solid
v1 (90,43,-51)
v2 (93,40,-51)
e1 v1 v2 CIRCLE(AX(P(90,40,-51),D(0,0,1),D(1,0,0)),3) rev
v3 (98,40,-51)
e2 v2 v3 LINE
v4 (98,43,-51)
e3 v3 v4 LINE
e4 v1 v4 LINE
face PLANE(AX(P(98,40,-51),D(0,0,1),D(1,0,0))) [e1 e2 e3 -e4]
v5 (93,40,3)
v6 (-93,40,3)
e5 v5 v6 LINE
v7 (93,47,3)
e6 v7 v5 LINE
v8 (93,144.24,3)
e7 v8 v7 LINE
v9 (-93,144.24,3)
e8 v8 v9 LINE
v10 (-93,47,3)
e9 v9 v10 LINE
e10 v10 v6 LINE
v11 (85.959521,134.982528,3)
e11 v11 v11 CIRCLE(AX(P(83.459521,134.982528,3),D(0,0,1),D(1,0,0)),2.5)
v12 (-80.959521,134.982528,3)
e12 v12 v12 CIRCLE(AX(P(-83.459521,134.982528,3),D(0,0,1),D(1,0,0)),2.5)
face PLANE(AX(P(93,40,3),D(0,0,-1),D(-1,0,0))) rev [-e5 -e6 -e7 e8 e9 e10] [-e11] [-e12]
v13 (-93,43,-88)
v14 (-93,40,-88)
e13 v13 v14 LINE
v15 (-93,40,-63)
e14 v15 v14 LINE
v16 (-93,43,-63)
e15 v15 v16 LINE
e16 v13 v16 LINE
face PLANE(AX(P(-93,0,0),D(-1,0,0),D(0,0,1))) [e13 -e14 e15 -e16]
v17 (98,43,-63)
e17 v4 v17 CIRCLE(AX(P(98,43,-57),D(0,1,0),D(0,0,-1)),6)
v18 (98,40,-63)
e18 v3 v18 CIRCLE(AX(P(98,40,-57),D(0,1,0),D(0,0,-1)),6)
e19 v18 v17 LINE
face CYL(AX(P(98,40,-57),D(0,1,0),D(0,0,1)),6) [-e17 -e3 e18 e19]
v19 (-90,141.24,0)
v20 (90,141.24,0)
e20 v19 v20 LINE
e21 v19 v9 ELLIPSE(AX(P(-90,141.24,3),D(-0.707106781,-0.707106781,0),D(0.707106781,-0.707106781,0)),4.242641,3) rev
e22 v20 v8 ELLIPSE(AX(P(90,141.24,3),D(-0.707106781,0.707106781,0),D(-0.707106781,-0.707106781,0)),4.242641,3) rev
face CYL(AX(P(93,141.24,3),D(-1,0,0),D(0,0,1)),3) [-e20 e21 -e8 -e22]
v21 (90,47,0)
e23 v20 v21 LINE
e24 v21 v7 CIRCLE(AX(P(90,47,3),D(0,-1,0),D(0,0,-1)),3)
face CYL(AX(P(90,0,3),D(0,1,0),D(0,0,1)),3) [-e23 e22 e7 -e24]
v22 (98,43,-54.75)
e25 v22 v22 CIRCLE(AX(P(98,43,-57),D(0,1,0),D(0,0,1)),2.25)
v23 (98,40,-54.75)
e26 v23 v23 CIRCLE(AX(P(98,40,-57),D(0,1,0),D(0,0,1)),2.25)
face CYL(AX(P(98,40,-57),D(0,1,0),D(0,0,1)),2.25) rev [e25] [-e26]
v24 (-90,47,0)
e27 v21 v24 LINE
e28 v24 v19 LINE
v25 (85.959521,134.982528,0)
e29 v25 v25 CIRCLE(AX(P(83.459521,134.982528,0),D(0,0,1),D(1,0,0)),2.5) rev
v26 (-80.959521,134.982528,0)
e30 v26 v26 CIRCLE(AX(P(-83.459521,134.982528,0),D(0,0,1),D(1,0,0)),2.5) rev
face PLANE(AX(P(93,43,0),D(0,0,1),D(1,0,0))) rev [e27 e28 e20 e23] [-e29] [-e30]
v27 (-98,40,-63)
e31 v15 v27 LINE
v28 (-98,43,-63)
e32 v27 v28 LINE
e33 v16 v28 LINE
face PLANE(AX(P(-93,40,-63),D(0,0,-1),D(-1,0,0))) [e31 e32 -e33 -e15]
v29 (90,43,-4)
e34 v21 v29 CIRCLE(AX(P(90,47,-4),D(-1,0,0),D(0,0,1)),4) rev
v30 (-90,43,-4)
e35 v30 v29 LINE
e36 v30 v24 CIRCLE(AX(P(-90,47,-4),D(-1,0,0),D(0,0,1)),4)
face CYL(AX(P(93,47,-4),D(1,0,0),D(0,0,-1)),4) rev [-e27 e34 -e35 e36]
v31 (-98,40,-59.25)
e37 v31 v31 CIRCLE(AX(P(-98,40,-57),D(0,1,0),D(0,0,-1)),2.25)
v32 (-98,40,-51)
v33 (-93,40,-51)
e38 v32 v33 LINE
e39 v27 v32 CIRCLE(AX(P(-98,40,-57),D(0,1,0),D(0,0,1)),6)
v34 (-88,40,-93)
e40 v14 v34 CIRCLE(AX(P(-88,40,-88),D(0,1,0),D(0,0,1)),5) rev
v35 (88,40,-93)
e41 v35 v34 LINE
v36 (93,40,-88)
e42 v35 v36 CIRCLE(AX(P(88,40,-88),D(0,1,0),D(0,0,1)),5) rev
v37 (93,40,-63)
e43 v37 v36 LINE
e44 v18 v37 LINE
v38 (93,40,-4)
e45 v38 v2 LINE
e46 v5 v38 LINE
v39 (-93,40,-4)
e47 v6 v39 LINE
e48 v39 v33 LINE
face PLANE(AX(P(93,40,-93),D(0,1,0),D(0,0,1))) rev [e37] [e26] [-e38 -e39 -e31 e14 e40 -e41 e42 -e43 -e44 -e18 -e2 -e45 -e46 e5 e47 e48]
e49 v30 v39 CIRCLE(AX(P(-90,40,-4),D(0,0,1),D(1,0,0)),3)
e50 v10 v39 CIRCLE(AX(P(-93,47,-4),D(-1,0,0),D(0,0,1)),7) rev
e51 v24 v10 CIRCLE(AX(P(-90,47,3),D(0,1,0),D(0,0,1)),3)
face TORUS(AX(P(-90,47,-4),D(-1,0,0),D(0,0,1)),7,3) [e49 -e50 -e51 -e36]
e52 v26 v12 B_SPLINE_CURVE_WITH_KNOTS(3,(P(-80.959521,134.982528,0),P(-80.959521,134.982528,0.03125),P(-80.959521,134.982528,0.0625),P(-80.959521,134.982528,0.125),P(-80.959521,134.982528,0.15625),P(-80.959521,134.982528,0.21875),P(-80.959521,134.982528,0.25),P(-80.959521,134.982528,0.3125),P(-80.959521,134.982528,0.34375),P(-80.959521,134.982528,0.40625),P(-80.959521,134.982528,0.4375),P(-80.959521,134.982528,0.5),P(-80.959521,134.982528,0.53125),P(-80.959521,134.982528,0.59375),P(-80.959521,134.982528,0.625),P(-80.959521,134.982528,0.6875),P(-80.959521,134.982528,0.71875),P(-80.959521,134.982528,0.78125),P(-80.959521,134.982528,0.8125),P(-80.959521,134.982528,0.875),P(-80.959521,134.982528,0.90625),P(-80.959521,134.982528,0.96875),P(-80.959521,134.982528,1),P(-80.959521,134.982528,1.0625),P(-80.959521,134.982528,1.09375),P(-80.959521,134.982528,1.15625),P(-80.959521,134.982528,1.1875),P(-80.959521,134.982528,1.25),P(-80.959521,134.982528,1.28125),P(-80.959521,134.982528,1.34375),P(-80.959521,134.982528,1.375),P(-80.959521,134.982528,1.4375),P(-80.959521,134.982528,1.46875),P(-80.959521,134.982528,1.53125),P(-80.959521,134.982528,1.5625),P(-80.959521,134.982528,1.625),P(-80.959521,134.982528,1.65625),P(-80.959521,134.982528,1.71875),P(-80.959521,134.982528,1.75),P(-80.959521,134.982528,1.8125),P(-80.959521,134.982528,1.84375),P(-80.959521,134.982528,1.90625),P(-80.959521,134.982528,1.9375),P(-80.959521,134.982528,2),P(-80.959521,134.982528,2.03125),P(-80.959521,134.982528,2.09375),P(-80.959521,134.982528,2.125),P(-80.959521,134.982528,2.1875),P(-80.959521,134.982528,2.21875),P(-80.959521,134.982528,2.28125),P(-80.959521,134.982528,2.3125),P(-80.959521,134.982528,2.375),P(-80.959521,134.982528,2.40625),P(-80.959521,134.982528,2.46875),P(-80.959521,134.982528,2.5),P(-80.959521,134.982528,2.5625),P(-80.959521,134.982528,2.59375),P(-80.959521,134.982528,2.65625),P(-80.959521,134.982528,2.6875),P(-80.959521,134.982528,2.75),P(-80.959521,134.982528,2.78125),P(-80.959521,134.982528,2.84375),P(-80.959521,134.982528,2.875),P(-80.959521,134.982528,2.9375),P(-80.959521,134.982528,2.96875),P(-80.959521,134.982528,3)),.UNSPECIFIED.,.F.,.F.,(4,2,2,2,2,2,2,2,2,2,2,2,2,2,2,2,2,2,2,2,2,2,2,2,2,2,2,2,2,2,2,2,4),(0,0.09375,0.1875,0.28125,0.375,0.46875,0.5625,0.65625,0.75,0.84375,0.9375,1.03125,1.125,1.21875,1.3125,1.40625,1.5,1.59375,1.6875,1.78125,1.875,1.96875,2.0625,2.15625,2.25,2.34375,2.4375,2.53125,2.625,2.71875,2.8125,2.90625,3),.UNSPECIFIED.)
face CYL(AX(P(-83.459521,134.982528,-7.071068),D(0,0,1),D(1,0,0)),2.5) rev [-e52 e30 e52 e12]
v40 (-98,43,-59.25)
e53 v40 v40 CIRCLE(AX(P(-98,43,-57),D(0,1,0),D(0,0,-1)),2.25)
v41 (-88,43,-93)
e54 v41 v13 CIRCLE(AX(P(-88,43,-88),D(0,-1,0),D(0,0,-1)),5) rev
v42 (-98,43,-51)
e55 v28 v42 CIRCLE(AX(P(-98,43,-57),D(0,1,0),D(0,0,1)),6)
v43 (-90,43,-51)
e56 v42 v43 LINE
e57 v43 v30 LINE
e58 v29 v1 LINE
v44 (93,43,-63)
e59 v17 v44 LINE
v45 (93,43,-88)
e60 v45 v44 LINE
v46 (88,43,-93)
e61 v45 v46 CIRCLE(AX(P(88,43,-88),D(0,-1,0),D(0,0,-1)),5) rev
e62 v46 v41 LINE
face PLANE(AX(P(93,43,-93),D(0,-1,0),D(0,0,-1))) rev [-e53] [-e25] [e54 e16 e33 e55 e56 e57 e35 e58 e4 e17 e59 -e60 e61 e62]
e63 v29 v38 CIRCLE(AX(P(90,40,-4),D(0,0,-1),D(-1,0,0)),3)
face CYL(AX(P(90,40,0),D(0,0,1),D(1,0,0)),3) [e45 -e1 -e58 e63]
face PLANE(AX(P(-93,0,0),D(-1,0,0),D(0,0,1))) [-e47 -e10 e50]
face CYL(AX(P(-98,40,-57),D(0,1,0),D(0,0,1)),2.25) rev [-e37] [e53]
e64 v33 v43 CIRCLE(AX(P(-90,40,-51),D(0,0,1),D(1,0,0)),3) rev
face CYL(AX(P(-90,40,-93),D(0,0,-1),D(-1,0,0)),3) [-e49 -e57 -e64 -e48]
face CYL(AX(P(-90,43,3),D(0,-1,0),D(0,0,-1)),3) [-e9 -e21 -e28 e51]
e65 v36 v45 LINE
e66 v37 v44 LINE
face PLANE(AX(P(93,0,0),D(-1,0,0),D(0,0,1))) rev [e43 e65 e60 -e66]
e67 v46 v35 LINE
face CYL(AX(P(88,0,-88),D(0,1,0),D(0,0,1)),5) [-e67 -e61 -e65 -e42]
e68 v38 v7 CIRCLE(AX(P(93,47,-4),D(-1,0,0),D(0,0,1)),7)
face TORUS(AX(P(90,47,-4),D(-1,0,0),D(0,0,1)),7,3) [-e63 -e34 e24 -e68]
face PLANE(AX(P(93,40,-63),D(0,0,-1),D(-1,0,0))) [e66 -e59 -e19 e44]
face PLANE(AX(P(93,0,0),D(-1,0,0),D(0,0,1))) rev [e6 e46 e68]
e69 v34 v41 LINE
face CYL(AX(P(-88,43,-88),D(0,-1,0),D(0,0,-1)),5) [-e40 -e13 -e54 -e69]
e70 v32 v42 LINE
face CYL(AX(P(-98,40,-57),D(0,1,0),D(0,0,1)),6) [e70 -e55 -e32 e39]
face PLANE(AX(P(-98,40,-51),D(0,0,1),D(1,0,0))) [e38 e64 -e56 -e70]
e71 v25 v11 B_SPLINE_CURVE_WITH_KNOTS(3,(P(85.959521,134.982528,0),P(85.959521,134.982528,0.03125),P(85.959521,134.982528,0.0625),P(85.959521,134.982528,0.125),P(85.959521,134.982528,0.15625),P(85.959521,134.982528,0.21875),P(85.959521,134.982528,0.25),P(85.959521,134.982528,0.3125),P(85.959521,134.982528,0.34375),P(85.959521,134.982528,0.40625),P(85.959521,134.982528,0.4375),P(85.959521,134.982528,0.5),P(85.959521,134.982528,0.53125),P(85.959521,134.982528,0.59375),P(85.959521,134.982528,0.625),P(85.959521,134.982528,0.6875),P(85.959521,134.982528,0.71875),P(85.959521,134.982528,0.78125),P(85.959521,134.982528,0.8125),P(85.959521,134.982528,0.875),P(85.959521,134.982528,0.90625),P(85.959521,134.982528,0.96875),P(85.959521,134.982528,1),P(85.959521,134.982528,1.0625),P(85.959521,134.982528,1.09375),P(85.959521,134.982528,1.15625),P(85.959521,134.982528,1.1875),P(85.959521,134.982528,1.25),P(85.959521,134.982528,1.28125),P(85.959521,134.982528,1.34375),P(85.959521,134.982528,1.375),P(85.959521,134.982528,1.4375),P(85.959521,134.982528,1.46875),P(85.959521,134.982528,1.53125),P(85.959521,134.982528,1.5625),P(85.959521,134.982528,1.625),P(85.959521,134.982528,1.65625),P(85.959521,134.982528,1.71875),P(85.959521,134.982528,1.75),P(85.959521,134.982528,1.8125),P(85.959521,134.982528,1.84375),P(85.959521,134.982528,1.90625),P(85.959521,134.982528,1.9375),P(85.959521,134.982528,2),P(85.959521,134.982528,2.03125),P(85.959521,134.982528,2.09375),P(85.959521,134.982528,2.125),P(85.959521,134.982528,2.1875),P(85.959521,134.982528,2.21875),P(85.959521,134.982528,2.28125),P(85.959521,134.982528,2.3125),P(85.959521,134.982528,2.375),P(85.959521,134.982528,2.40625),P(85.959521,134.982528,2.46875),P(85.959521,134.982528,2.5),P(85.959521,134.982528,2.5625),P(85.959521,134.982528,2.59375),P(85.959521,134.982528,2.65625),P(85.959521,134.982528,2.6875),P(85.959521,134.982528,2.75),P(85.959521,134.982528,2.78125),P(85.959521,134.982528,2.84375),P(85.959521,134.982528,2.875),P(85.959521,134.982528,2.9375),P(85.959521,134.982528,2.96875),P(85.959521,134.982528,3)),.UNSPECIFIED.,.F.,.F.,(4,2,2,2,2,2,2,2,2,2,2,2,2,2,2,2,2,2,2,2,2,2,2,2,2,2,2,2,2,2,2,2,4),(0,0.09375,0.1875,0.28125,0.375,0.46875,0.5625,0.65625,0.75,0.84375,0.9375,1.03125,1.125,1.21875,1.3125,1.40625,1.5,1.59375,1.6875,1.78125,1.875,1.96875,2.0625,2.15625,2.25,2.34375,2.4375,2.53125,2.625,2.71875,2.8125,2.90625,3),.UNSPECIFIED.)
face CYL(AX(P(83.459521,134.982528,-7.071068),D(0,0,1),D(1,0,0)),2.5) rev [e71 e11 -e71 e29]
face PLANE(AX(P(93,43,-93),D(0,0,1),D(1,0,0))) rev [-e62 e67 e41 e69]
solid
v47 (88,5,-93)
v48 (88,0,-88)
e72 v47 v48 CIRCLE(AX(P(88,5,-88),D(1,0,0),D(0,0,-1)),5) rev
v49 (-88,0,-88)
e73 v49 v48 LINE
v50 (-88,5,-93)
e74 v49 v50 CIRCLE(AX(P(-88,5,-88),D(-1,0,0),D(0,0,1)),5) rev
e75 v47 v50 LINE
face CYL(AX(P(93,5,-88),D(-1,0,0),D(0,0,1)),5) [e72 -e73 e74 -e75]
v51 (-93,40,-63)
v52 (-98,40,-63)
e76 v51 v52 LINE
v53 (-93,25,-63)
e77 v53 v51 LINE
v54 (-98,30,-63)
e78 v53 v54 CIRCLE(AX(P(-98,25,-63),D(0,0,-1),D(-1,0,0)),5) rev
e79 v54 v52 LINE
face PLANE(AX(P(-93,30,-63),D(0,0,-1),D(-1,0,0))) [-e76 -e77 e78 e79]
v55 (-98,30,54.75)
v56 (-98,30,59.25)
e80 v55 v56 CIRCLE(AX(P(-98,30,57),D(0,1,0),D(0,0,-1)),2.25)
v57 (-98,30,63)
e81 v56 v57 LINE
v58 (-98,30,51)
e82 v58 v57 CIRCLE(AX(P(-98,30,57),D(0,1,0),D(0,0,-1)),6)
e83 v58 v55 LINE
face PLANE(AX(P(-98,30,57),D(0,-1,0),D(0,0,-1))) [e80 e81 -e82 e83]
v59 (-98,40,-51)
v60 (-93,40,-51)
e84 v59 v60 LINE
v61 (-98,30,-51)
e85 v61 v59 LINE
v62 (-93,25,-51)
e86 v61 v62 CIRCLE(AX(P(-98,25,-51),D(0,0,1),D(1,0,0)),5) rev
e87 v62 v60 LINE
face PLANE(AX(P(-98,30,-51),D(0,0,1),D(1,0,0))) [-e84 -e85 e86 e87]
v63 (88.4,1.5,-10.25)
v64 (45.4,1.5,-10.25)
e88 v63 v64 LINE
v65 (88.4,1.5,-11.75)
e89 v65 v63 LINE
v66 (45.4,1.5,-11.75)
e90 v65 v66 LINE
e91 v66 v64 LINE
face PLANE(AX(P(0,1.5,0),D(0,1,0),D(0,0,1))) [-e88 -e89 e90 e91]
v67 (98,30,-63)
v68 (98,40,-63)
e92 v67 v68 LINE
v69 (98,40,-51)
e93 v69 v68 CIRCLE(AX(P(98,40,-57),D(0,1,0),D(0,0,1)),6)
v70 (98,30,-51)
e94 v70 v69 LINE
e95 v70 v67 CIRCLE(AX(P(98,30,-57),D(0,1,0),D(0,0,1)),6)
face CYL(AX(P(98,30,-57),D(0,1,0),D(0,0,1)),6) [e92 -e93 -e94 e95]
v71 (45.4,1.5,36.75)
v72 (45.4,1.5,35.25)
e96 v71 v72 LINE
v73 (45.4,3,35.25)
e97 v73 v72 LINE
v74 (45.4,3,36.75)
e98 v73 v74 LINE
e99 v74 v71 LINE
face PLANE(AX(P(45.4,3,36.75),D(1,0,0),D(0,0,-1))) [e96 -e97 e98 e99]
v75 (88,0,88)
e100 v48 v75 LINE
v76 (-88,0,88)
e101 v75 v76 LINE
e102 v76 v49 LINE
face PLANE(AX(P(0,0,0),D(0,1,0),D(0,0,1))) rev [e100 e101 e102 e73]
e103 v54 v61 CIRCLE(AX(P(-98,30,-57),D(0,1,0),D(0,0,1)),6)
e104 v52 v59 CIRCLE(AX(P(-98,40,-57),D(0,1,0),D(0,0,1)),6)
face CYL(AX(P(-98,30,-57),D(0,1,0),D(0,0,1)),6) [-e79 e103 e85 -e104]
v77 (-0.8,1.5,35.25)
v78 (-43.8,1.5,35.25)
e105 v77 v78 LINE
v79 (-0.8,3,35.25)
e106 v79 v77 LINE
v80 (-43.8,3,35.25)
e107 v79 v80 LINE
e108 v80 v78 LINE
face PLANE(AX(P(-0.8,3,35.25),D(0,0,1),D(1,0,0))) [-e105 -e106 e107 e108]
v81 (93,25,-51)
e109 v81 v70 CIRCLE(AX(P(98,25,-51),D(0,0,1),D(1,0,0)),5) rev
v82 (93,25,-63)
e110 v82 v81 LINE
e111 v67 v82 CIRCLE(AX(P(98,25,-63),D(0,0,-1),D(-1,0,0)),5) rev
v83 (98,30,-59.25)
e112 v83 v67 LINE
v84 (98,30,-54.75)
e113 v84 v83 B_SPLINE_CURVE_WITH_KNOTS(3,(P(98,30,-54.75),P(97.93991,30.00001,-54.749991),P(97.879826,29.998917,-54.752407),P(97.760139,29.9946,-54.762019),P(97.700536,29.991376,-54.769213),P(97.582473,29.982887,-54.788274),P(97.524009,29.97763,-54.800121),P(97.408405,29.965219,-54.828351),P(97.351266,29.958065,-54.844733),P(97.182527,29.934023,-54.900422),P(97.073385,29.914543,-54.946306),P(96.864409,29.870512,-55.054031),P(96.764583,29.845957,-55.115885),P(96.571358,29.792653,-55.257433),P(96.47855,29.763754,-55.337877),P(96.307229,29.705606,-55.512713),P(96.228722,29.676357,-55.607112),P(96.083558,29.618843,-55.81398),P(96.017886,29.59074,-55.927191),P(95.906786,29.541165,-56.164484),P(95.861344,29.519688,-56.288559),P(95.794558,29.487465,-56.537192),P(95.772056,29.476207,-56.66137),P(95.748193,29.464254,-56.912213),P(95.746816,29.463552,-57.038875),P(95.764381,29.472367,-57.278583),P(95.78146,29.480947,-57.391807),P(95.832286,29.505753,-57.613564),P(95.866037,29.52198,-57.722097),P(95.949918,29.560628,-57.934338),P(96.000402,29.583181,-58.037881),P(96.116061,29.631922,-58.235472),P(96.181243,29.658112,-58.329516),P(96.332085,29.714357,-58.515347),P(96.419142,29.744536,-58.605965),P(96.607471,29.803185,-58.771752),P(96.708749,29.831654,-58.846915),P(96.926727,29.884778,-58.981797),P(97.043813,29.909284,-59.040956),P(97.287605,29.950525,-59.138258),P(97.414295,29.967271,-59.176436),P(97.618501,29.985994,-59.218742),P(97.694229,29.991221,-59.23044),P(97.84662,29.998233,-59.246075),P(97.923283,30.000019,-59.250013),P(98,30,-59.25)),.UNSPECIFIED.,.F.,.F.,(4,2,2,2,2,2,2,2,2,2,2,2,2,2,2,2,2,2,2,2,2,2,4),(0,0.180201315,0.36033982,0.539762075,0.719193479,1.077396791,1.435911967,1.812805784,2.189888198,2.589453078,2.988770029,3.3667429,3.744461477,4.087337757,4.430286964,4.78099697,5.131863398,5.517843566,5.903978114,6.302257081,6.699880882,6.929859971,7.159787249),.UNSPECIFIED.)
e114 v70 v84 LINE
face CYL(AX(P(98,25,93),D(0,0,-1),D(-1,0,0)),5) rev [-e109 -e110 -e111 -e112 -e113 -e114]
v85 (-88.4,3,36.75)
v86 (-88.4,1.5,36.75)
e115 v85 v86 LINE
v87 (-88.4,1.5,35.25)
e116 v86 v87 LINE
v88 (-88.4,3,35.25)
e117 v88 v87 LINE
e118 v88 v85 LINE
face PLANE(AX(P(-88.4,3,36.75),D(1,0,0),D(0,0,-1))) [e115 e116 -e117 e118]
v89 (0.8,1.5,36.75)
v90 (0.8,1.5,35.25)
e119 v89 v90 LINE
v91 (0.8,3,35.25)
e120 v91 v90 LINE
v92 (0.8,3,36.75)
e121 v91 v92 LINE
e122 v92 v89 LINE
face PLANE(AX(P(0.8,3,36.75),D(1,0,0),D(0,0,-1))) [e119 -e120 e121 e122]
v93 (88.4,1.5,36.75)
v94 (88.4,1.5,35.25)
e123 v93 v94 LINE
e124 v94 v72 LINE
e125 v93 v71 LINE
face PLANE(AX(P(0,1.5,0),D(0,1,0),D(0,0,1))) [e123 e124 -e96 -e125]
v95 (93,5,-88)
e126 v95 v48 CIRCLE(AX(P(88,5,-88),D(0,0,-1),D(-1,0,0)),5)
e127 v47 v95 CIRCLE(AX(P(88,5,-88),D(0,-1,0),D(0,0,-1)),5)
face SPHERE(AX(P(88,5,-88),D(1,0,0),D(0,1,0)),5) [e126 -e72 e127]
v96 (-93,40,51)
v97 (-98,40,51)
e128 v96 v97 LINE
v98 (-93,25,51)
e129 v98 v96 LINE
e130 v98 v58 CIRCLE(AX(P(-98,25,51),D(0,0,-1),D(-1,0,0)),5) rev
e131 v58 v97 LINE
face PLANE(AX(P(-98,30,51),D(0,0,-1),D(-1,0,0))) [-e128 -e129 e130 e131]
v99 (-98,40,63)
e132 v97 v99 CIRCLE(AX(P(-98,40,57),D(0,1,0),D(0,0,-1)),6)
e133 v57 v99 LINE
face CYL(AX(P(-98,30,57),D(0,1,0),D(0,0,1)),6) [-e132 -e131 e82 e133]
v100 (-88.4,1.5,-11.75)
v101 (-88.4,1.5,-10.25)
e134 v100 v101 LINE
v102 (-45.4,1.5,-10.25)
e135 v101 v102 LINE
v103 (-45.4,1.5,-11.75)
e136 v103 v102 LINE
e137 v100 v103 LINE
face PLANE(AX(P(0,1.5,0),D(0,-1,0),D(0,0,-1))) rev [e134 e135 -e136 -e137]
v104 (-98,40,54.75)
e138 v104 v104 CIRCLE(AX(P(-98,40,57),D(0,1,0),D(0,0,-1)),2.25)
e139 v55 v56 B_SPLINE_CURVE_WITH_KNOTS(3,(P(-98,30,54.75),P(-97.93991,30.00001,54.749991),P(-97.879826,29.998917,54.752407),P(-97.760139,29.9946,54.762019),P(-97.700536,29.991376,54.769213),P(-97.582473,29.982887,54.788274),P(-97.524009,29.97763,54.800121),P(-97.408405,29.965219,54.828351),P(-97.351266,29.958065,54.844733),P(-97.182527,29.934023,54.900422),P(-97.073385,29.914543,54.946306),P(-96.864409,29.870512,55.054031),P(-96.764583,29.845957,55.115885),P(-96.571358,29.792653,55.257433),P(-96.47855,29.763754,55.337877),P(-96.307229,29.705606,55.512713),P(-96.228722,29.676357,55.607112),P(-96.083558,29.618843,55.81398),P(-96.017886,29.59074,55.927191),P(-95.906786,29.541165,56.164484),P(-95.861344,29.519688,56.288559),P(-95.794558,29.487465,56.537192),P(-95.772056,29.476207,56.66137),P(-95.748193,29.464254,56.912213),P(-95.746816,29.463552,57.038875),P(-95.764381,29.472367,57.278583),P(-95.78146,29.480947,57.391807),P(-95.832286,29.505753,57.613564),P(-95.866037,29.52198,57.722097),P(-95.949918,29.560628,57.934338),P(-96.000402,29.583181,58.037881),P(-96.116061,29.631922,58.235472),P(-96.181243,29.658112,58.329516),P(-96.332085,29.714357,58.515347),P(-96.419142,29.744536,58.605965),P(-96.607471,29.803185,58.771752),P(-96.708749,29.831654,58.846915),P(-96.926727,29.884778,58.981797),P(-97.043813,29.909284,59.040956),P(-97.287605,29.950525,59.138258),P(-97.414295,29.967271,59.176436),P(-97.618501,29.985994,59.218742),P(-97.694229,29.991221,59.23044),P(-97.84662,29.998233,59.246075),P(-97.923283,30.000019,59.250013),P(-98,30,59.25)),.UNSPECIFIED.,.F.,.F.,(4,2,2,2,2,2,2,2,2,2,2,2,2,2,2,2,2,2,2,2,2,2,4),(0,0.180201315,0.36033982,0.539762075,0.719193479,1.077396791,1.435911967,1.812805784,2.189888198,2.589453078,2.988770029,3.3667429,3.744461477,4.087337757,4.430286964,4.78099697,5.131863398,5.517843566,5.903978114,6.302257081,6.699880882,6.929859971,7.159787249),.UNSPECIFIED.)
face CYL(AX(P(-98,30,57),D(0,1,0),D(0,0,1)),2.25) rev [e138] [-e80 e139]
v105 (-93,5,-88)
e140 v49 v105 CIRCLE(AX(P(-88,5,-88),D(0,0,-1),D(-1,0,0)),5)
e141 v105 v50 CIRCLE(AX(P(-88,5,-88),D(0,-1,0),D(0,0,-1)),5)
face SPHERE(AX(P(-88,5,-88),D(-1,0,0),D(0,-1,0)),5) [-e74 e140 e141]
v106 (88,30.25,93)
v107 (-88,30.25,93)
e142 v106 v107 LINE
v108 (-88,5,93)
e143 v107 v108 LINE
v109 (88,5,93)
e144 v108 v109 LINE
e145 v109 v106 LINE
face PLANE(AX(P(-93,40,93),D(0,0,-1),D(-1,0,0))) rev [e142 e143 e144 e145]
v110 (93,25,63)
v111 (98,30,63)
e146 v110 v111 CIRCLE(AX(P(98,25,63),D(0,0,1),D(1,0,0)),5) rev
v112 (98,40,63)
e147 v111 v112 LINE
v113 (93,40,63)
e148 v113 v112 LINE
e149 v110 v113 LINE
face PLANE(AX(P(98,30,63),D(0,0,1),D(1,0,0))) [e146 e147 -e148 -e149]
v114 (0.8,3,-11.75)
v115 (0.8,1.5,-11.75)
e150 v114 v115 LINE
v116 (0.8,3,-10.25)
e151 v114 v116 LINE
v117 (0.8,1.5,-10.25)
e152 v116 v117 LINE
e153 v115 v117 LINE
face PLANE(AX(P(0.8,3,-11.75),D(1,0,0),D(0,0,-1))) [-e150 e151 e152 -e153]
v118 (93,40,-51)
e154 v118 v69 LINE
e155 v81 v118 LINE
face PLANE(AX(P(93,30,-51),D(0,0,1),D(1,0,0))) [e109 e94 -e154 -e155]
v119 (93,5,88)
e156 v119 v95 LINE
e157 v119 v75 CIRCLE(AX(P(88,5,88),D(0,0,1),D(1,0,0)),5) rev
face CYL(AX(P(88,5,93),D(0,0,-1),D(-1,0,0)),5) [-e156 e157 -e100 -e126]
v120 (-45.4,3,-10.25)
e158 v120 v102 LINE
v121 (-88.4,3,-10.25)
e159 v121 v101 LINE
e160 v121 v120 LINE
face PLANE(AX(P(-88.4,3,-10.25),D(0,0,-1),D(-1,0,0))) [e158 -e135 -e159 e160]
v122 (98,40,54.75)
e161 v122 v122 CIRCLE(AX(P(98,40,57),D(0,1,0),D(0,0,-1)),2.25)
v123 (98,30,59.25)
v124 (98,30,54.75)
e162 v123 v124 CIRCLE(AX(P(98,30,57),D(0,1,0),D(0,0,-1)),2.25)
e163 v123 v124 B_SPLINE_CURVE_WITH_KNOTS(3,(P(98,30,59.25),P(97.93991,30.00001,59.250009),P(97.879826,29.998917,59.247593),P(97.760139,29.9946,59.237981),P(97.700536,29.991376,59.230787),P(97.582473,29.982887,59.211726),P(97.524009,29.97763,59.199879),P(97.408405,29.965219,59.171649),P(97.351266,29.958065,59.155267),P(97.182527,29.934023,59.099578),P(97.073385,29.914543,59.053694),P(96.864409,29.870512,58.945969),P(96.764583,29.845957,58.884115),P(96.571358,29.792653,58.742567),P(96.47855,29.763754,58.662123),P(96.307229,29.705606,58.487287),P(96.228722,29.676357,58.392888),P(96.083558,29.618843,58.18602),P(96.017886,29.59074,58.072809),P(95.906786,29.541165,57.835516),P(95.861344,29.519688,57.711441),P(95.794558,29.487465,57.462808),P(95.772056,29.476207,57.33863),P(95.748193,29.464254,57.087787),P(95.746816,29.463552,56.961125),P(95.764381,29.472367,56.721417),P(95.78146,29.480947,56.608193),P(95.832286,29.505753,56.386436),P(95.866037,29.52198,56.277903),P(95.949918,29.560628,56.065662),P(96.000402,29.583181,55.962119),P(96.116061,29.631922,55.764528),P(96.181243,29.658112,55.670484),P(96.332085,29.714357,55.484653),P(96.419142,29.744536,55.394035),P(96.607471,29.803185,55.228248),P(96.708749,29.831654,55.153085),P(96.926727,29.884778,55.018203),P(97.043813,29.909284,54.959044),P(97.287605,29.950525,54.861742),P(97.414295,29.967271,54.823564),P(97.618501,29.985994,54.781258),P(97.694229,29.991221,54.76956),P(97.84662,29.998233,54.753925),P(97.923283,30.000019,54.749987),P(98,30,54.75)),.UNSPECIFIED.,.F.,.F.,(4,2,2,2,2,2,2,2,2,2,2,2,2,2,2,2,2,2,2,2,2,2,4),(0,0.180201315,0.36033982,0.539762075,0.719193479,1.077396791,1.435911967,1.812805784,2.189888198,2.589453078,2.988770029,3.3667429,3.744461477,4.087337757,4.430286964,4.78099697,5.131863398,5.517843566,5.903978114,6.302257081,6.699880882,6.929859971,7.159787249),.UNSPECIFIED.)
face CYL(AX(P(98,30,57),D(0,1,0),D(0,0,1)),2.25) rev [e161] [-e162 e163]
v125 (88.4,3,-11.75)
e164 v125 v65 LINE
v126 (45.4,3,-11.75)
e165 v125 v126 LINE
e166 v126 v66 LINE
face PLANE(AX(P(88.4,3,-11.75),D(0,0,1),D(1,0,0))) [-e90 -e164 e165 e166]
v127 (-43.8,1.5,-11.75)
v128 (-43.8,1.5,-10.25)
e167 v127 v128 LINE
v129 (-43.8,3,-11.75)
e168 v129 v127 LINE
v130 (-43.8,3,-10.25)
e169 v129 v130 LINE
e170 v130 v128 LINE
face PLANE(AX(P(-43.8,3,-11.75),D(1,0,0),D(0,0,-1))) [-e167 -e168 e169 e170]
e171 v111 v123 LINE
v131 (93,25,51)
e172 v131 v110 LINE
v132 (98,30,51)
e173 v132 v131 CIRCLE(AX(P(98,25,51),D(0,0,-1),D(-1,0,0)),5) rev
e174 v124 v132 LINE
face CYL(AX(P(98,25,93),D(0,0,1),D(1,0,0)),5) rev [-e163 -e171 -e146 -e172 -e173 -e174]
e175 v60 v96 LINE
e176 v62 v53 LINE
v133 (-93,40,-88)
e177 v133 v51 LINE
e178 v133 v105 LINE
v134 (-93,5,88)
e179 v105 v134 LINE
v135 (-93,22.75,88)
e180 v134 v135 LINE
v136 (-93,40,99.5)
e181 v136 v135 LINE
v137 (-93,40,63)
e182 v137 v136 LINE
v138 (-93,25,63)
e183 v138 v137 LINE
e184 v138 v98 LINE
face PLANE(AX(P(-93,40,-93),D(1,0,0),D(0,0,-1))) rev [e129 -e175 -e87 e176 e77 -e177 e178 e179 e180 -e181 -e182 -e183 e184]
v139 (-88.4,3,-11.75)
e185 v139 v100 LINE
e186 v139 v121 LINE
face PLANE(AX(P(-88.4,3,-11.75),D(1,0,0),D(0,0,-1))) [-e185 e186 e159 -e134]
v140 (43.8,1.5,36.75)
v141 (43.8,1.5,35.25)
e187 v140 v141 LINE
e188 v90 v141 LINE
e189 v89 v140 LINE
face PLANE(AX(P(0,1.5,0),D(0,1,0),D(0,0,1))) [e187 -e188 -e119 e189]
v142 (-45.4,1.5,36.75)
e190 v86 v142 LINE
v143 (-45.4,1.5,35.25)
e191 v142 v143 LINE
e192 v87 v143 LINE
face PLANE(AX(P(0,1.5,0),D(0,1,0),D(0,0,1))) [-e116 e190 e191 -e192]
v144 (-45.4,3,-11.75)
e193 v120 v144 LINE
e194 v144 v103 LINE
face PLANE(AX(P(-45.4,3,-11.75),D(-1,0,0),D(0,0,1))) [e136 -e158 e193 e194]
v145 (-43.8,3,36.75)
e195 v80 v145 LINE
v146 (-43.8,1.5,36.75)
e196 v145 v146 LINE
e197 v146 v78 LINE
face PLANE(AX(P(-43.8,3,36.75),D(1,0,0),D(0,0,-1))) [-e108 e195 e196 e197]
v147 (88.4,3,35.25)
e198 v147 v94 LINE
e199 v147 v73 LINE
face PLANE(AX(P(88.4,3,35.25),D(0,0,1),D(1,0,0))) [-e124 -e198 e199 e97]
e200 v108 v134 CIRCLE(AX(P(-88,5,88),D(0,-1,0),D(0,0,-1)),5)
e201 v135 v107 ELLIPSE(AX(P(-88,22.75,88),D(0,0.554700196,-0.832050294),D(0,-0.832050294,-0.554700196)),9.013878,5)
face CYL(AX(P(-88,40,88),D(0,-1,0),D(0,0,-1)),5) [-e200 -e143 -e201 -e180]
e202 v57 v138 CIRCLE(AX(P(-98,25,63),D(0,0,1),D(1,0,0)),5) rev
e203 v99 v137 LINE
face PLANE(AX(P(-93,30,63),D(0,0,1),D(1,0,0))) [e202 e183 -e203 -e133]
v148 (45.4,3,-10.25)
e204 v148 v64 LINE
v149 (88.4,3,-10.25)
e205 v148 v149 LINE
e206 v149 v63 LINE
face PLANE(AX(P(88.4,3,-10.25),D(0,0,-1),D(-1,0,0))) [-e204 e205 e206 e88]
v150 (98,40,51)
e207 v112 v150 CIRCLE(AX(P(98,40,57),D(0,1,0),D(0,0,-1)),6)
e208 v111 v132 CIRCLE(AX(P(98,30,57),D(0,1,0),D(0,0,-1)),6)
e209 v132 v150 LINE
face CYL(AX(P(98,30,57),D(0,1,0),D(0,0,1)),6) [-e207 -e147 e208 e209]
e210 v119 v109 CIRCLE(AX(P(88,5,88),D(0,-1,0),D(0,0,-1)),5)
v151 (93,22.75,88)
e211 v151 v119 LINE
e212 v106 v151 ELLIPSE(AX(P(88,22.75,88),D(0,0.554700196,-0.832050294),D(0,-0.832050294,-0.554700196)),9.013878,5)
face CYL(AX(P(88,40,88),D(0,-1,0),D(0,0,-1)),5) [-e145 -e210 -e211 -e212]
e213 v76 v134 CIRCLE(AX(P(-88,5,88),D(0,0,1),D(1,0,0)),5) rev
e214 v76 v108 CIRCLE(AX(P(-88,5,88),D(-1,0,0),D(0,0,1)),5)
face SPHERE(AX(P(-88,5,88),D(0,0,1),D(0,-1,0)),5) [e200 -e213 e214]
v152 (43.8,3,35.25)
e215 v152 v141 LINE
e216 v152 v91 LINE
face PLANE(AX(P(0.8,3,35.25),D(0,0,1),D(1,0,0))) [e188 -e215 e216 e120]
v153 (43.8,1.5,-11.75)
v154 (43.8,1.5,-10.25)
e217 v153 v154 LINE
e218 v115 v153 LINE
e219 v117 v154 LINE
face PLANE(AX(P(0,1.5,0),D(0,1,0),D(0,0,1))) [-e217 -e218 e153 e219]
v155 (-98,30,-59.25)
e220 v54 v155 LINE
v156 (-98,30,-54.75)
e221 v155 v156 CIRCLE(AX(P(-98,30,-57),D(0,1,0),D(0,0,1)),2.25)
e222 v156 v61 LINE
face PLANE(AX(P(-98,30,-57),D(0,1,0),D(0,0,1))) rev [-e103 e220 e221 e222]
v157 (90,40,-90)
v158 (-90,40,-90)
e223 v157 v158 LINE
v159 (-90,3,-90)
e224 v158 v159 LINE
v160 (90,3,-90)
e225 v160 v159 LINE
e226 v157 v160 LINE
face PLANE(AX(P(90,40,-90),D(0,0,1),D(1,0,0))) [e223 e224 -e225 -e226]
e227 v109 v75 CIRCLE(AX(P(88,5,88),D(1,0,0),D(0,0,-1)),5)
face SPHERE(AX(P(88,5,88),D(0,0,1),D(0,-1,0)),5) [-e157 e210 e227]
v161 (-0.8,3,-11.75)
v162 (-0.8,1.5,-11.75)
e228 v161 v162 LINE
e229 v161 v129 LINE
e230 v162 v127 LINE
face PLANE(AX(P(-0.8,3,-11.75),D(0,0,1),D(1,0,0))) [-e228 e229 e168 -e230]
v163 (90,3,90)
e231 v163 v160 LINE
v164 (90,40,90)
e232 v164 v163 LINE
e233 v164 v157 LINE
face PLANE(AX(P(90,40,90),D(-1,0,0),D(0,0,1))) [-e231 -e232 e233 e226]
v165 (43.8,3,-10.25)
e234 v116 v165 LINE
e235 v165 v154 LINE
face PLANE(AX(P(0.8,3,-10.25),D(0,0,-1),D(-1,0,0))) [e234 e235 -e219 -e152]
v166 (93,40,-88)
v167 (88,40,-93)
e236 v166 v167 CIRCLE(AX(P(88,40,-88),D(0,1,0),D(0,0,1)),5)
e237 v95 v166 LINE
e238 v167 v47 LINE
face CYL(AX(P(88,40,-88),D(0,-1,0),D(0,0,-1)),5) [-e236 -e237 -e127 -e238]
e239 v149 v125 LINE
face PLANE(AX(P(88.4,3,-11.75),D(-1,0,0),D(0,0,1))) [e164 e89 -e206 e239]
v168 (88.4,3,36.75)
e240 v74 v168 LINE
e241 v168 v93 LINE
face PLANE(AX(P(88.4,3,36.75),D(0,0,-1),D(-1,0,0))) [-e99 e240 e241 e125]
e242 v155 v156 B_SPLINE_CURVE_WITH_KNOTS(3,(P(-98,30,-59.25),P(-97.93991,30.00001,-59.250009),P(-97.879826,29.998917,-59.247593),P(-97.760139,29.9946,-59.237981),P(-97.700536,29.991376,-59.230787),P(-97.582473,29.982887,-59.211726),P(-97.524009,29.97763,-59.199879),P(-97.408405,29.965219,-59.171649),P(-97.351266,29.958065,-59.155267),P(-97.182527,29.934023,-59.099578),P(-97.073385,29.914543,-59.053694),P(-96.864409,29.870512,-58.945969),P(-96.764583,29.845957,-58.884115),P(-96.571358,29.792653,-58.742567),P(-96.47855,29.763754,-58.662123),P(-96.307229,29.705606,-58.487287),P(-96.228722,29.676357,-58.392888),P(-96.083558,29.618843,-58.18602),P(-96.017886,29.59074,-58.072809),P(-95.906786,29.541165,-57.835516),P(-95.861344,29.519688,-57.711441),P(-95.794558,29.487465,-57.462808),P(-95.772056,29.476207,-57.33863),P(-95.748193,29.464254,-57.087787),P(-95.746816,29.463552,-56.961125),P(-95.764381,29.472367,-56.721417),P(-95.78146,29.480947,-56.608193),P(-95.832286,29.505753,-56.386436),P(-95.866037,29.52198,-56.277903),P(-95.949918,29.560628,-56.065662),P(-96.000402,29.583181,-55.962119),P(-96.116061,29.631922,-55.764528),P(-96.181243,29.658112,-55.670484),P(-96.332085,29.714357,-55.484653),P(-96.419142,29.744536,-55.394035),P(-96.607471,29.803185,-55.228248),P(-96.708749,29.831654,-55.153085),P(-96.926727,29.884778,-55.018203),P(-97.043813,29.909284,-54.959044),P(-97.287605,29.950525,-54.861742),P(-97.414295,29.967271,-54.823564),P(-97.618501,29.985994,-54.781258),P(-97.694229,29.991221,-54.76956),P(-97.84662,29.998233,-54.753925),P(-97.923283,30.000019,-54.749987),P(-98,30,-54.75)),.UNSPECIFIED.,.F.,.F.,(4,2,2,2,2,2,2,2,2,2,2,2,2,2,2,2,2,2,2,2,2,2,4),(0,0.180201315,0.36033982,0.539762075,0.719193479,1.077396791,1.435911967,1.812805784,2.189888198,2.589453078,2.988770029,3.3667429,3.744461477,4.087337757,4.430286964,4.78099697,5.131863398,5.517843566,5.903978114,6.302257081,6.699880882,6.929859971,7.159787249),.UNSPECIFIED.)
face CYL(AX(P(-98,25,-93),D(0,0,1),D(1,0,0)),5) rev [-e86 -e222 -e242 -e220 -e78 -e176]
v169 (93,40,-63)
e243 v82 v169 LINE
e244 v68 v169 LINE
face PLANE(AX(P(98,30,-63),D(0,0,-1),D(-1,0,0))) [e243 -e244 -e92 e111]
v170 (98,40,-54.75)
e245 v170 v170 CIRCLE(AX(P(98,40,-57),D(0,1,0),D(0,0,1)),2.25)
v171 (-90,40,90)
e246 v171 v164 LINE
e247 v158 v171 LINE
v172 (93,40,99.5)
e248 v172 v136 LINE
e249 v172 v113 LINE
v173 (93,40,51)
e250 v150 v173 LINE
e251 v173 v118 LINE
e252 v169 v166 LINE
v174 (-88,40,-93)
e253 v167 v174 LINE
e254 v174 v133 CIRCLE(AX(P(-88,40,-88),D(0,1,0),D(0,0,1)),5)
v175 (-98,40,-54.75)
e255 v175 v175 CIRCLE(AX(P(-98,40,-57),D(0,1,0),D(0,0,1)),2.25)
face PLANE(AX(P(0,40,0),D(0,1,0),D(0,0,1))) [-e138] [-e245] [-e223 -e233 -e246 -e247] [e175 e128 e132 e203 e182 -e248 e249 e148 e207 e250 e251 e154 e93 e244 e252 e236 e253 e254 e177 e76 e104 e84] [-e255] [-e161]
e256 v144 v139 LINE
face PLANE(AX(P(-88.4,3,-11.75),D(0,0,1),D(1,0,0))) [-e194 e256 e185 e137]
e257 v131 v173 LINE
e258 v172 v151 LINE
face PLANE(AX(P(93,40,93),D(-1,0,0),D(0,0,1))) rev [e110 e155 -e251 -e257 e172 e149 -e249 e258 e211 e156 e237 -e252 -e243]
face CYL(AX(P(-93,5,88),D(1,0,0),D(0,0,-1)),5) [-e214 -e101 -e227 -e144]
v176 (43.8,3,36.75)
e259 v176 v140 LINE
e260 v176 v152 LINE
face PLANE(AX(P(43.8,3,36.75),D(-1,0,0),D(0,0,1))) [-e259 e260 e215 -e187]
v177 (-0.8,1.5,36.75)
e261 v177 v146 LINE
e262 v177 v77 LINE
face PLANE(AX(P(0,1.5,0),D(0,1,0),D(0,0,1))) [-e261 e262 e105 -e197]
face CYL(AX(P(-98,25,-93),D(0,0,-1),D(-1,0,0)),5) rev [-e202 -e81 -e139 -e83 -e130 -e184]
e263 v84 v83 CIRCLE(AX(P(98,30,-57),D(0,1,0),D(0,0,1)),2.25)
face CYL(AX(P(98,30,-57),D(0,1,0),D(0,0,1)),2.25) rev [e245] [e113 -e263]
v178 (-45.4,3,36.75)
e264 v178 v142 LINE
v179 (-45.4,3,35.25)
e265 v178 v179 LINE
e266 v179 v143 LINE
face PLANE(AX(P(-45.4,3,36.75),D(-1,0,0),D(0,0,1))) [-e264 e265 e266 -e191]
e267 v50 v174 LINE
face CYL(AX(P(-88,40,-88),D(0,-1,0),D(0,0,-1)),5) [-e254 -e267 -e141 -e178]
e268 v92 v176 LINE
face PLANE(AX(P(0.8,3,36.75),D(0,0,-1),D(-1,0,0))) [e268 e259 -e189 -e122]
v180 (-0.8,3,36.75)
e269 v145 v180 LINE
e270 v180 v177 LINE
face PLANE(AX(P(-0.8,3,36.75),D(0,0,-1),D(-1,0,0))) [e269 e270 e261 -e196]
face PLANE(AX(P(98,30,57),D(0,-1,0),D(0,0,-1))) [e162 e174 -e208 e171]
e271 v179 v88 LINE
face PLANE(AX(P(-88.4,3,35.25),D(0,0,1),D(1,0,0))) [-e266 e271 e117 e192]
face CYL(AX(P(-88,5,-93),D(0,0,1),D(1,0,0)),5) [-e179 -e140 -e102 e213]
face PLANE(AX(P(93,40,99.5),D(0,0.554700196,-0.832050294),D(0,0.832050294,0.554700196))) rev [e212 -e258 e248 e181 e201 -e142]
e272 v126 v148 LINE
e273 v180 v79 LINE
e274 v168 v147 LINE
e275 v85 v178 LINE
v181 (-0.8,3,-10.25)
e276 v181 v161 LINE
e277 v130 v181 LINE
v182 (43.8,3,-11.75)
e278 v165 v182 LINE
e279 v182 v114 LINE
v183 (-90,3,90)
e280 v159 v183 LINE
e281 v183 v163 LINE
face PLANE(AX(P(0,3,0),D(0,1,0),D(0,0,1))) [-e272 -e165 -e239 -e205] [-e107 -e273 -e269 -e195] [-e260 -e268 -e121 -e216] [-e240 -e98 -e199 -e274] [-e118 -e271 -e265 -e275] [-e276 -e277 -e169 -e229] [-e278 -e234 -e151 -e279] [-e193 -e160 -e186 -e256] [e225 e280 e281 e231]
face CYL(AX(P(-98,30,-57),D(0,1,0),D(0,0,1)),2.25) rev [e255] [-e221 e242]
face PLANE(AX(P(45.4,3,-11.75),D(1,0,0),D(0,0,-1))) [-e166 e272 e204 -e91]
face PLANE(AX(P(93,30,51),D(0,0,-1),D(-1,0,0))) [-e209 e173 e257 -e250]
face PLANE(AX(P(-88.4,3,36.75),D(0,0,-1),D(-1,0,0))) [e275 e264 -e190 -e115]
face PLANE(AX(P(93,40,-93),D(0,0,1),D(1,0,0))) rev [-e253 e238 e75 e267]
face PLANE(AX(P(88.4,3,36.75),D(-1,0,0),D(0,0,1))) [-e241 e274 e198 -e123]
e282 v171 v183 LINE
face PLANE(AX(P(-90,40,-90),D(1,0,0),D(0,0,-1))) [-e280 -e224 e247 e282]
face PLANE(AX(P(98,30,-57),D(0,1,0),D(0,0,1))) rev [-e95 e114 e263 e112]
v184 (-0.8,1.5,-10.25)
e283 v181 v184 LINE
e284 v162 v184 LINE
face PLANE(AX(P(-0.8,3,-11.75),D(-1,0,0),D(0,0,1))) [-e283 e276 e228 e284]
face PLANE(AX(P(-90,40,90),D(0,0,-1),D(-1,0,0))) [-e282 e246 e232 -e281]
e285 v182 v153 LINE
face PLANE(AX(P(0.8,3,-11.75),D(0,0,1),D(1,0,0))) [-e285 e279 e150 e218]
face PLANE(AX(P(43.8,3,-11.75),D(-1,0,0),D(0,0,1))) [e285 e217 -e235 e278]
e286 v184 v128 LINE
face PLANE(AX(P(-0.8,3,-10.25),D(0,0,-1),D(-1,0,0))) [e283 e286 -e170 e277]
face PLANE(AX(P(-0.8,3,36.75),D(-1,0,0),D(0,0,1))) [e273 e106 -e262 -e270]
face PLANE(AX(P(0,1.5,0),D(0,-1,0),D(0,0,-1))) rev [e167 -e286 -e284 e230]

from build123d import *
from OCP.BRepFilletAPI import BRepFilletAPI_MakeFillet

# Parameters (mm, degrees)
SKETCH2_W                = 180
SKETCH2_H                = 180
SKETCH2_W_2              = 43
SKETCH2_H_2              = 1.5
BOSS_EXTRUDE1_DEPTH      = 3
SKETCH2_5_W              = 43
SKETCH2_5_H              = 1.5
BOSS_EXTRUDE2_DEPTH      = 1.5
SKETCH3_W                = 186
SKETCH3_H                = 186
SKETCH3_W_2              = 180
SKETCH3_H_2              = 180
BOSS_EXTRUDE3_DEPTH      = 40
BOSS_EXTRUDE5_DEPTH      = 93
BOSS_EXTRUDE5_DEPTH_BACK = 93
BOSS_EXTRUDE6_DEPTH      = 93
BOSS_EXTRUDE6_DEPTH_BACK = 93
FILLET1_R                = 5
FILLET3_R1               = 5
FILLET3_R2               = 4
SKETCH7_R                = 2.5
CUT_EXTRUDE1_DEPTH       = 3
SKETCH8_R                = 2.25
BOSS_EXTRUDE7_DEPTH      = 3
SKETCH9_R                = 2.25
BOSS_EXTRUDE8_DEPTH      = 10
FILLET4_R                = 5
FILLET5_R                = 3


# Some blends are built 0.0001 mm under size
with BuildPart() as part:
    # Sketch2 → Boss-Extrude1 (new body)
    with BuildSketch(Plane(origin=(0, 0, 0), x_dir=(1, 0, 0), z_dir=(0, 1, 0))):
        Rectangle(SKETCH2_W, SKETCH2_H)
        with Locations((-66.9, 11)):
            Rectangle(SKETCH2_W_2, SKETCH2_H_2, mode=Mode.SUBTRACT)
        with Locations((-22.3, 11)):
            Rectangle(SKETCH2_W_2, SKETCH2_H_2, mode=Mode.SUBTRACT)
        with Locations((66.9, 11)):
            Rectangle(SKETCH2_W_2, SKETCH2_H_2, mode=Mode.SUBTRACT)
        with Locations((22.3, 11)):
            Rectangle(SKETCH2_W_2, SKETCH2_H_2, mode=Mode.SUBTRACT)
        with Locations((66.9, -36)):
            Rectangle(SKETCH2_W_2, SKETCH2_H_2, mode=Mode.SUBTRACT)
        with Locations((22.3, -36)):
            Rectangle(SKETCH2_W_2, SKETCH2_H_2, mode=Mode.SUBTRACT)
        with Locations((-22.3, -36)):
            Rectangle(SKETCH2_W_2, SKETCH2_H_2, mode=Mode.SUBTRACT)
        with Locations((-66.9, -36)):
            Rectangle(SKETCH2_W_2, SKETCH2_H_2, mode=Mode.SUBTRACT)
    extrude(amount=BOSS_EXTRUDE1_DEPTH)

    # Sketch2<5> → Boss-Extrude2 (add)
    with BuildSketch(Plane(origin=(0, 0, 0), x_dir=(1, 0, 0), z_dir=(0, 1, 0))):
        with Locations((22.3, 11)):
            Rectangle(SKETCH2_5_W, SKETCH2_5_H)
        with Locations((66.9, 11)):
            Rectangle(SKETCH2_5_W, SKETCH2_5_H)
        with Locations((-66.9, -36)):
            Rectangle(SKETCH2_5_W, SKETCH2_5_H)
        with Locations((-22.3, -36)):
            Rectangle(SKETCH2_5_W, SKETCH2_5_H)
        with Locations((66.9, -36)):
            Rectangle(SKETCH2_5_W, SKETCH2_5_H)
        with Locations((22.3, -36)):
            Rectangle(SKETCH2_5_W, SKETCH2_5_H)
        with Locations((-66.9, 11)):
            Rectangle(SKETCH2_5_W, SKETCH2_5_H)
        with Locations((-22.3, 11)):
            Rectangle(SKETCH2_5_W, SKETCH2_5_H)
    extrude(amount=BOSS_EXTRUDE2_DEPTH)

    # Sketch3 → Boss-Extrude3 (add)
    with BuildSketch(Plane(origin=(0, 0, 0), x_dir=(1, 0, 0), z_dir=(0, 1, 0))):
        Rectangle(SKETCH3_W, SKETCH3_H)
        Rectangle(SKETCH3_W_2, SKETCH3_H_2, mode=Mode.SUBTRACT)
    extrude(amount=BOSS_EXTRUDE3_DEPTH)

    # Sketch5 → Boss-Extrude5 (add, two sides: drawn at the far end of the back side and taken through both)
    with BuildSketch(Plane(origin=(0, 0, 0), x_dir=(0, 0, -1), z_dir=(1, 0, 0)).offset(-BOSS_EXTRUDE5_DEPTH_BACK)):
        Polygon((-93, 40), (-99.5, 40), (-93, 30.25), align=None)
    extrude(amount=BOSS_EXTRUDE5_DEPTH + BOSS_EXTRUDE5_DEPTH_BACK)

    # Fillet1
    fillet1_edges = [part.edges().sort_by_distance(p)[0] for p in [
        (93, 0, 0),
        (0, 0, -93),
        (93, 20, -93),
        (-93, 0, 0),
        (-93, 20, -93),
        (0, 0, 93),
        (93, 15.125, 93),
        (-93, 15.125, 93),
    ]]
    fillet(fillet1_edges, radius=FILLET1_R)

    # Sketch9 → Boss-Extrude8 (add)
    # profile 1 of 4: a face of its own
    with BuildSketch(Plane(origin=(0, 40, 0), x_dir=(1, 0, 0), z_dir=(0, 1, 0))):
        with BuildLine():
            Line((93, 51), (98, 51))
            ThreePointArc((98, 51), (104, 57), (98, 63))
            Line((98, 63), (93, 63))
            Line((93, 63), (93, 51))
        make_face()
        with Locations(Location((98, 57, 0), (0, 0, 270))):
            Circle(SKETCH9_R, mode=Mode.SUBTRACT)
    # profile 2 of 4: a face of its own
    with BuildSketch(Plane(origin=(0, 40, 0), x_dir=(1, 0, 0), z_dir=(0, 1, 0))):
        with BuildLine():
            Line((-98, 51), (-93, 51))
            Line((-93, 51), (-93, 63))
            Line((-93, 63), (-98, 63))
            ThreePointArc((-98, 63), (-104, 57), (-98, 51))
        make_face()
        with Locations(Location((-98, 57, 0), (0, 0, 90))):
            Circle(SKETCH9_R, mode=Mode.SUBTRACT)
    # profile 3 of 4: a face of its own
    with BuildSketch(Plane(origin=(0, 40, 0), x_dir=(1, 0, 0), z_dir=(0, 1, 0))):
        with BuildLine():
            Line((93, -51), (93, -63))
            Line((93, -63), (98, -63))
            ThreePointArc((98, -63), (104, -57), (98, -51))
            Line((98, -51), (93, -51))
        make_face()
        with Locations(Location((98, -57, 0), (0, 0, 90))):
            Circle(SKETCH9_R, mode=Mode.SUBTRACT)
    # profile 4 of 4: a face of its own
    with BuildSketch(Plane(origin=(0, 40, 0), x_dir=(1, 0, 0), z_dir=(0, 1, 0))):
        with BuildLine():
            Line((-93, -51), (-93, -63))
            Line((-93, -63), (-98, -63))
            ThreePointArc((-98, -63), (-104, -57), (-98, -51))
            Line((-98, -51), (-93, -51))
        make_face()
        with Locations(Location((-98, -57, 0), (0, 0, 90))):
            Circle(SKETCH9_R, mode=Mode.SUBTRACT)
    extrude(amount=-BOSS_EXTRUDE8_DEPTH)

    # Fillet4
    # the kernel refuses this fillet: 5 mm, written as the material it adds along each edge
    with BuildSketch(Plane(origin=(93, 30, -63), x_dir=(0, -1, 0), z_dir=(0, 0, 1))) as fillet4_piece_1_section:
        with BuildLine():
            CenterArc((FILLET4_R, FILLET4_R), FILLET4_R, 180, 90)
            Line((0, FILLET4_R), (0, 0))
            Line((0, 0), (FILLET4_R, 0))
        make_face()
    fillet4_piece_1 = extrude(amount=12, mode=Mode.PRIVATE)
    fillet4_piece_1 = fillet4_piece_1 - Plane(origin=(98, 28.528949062, -57), x_dir=(0, 0, 1), z_dir=(0, 1, 0)) * Cylinder(2.25, 44, mode=Mode.PRIVATE)
    add(fillet4_piece_1)
    with BuildSketch(Plane(origin=(93, 30, 51), x_dir=(0, -1, 0), z_dir=(0, 0, 1))) as fillet4_piece_2_section:
        with BuildLine():
            CenterArc((FILLET4_R, FILLET4_R), FILLET4_R, 180, 90)
            Line((0, FILLET4_R), (0, 0))
            Line((0, 0), (FILLET4_R, 0))
        make_face()
    fillet4_piece_2 = extrude(amount=12, mode=Mode.PRIVATE)
    fillet4_piece_2 = fillet4_piece_2 - Plane(origin=(98, 28.528949062, 57), x_dir=(0, 0, -1), z_dir=(0, 1, 0)) * Cylinder(2.25, 44, mode=Mode.PRIVATE)
    add(fillet4_piece_2)
    with BuildSketch(Plane(origin=(-93, 30, -51), x_dir=(0, -1, 0), z_dir=(0, 0, -1))) as fillet4_piece_3_section:
        with BuildLine():
            CenterArc((FILLET4_R, FILLET4_R), FILLET4_R, 180, 90)
            Line((0, FILLET4_R), (0, 0))
            Line((0, 0), (FILLET4_R, 0))
        make_face()
    fillet4_piece_3 = extrude(amount=12, mode=Mode.PRIVATE)
    fillet4_piece_3 = fillet4_piece_3 - Plane(origin=(-98, 28.528949062, -57), x_dir=(0, 0, -1), z_dir=(0, 1, 0)) * Cylinder(2.25, 44, mode=Mode.PRIVATE)
    add(fillet4_piece_3)
    with BuildSketch(Plane(origin=(-93, 30, 51), x_dir=(0, -1, 0), z_dir=(0, 0, 1))) as fillet4_piece_4_section:
        with BuildLine():
            CenterArc((FILLET4_R, -FILLET4_R), FILLET4_R, 90, 90)
            Line((0, -FILLET4_R), (0, 0))
            Line((0, 0), (FILLET4_R, 0))
        make_face()
    fillet4_piece_4 = extrude(amount=12, mode=Mode.PRIVATE)
    fillet4_piece_4 = fillet4_piece_4 - Plane(origin=(-98, 28.528949062, 57), x_dir=(0, 0, -1), z_dir=(0, 1, 0)) * Cylinder(2.25, 44, mode=Mode.PRIVATE)
    add(fillet4_piece_4)


with BuildPart() as body_2:
    # Sketch6 → Boss-Extrude6 (new, two sides: drawn at the far end of the back side and taken through both)
    with BuildSketch(Plane(origin=(0, 0, 0), x_dir=(0, 0, -1), z_dir=(1, 0, 0)).offset(-BOSS_EXTRUDE6_DEPTH_BACK)):
        Polygon((93, 40), (-3, 40), (-3, 144.24), (0, 144.24), (0, 43), (93, 43), align=None)
    extrude(amount=BOSS_EXTRUDE6_DEPTH + BOSS_EXTRUDE6_DEPTH_BACK)

    # Fillet3: one fillet with a radius per group of edges: ONE call of the kernel's fillet builder (fillet() takes one radius for all edges)
    fillet3_edges_1 = [body_2.edges().sort_by_distance(p)[0] for p in [
        (93, 41.5, -93),
        (-93, 41.5, -93),
    ]]
    fillet3_edges_2 = [body_2.edges().sort_by_distance(p)[0] for p in [
        (0, 43, 0),
    ]]
    fillet3 = BRepFilletAPI_MakeFillet(body_2.part.solid().wrapped)
    for e in fillet3_edges_1:
        fillet3.Add(FILLET3_R1, e.wrapped)
    for e in fillet3_edges_2:
        fillet3.Add(FILLET3_R2, e.wrapped)
    add(Compound.cast(fillet3.Shape()), mode=Mode.REPLACE)

    # Sketch7 → Cut-Extrude1 (cut)
    with BuildSketch(Plane.XY.offset(3)):
        with Locations((83.459521349, 134.98252756)):
            Circle(SKETCH7_R)
        with Locations((-83.459521349, 134.98252756)):
            Circle(SKETCH7_R)
    extrude(amount=-CUT_EXTRUDE1_DEPTH, mode=Mode.SUBTRACT)

    # Sketch8 → Boss-Extrude7 (add)
    # profile 1 of 2: a face of its own
    with BuildSketch(Plane(origin=(0, 43, 0), x_dir=(1, 0, 0), z_dir=(0, 1, 0))):
        with BuildLine():
            Line((93, 63), (98, 63))
            ThreePointArc((98, 63), (104, 57), (98, 51))
            Line((98, 51), (93, 51))
            Line((93, 51), (93, 63))
        make_face()
        with Locations(Location((98, 57, 0), (0, 0, 270))):
            Circle(SKETCH8_R, mode=Mode.SUBTRACT)
    # profile 2 of 2: a face of its own
    with BuildSketch(Plane(origin=(0, 43, 0), x_dir=(1, 0, 0), z_dir=(0, 1, 0))):
        with BuildLine():
            Line((-93, 63), (-93, 51))
            Line((-93, 51), (-98, 51))
            ThreePointArc((-98, 51), (-104, 57), (-98, 63))
            Line((-98, 63), (-93, 63))
        make_face()
        with Locations(Location((-98, 57, 0), (0, 0, 90))):
            Circle(SKETCH8_R, mode=Mode.SUBTRACT)
    extrude(amount=-BOSS_EXTRUDE7_DEPTH)

    # Fillet5
    fillet5_edges = [body_2.edges().sort_by_distance(p)[0] for p in [
        (93, 43, -27.5),
        (93, 44.171572875, -1.171572875),
        (-93, 43, -27.5),
        (-93, 44.171572875, -1.171572875),
        (93, 95.62, 0),
        (0, 144.24, 0),
        (-93, 95.62, 0),
    ]]
    fillet(fillet5_edges, radius=FILLET5_R - 0.0001)  # a hair under: the kernel refuses the full size


solid = Compound([part.part, body_2.part])
